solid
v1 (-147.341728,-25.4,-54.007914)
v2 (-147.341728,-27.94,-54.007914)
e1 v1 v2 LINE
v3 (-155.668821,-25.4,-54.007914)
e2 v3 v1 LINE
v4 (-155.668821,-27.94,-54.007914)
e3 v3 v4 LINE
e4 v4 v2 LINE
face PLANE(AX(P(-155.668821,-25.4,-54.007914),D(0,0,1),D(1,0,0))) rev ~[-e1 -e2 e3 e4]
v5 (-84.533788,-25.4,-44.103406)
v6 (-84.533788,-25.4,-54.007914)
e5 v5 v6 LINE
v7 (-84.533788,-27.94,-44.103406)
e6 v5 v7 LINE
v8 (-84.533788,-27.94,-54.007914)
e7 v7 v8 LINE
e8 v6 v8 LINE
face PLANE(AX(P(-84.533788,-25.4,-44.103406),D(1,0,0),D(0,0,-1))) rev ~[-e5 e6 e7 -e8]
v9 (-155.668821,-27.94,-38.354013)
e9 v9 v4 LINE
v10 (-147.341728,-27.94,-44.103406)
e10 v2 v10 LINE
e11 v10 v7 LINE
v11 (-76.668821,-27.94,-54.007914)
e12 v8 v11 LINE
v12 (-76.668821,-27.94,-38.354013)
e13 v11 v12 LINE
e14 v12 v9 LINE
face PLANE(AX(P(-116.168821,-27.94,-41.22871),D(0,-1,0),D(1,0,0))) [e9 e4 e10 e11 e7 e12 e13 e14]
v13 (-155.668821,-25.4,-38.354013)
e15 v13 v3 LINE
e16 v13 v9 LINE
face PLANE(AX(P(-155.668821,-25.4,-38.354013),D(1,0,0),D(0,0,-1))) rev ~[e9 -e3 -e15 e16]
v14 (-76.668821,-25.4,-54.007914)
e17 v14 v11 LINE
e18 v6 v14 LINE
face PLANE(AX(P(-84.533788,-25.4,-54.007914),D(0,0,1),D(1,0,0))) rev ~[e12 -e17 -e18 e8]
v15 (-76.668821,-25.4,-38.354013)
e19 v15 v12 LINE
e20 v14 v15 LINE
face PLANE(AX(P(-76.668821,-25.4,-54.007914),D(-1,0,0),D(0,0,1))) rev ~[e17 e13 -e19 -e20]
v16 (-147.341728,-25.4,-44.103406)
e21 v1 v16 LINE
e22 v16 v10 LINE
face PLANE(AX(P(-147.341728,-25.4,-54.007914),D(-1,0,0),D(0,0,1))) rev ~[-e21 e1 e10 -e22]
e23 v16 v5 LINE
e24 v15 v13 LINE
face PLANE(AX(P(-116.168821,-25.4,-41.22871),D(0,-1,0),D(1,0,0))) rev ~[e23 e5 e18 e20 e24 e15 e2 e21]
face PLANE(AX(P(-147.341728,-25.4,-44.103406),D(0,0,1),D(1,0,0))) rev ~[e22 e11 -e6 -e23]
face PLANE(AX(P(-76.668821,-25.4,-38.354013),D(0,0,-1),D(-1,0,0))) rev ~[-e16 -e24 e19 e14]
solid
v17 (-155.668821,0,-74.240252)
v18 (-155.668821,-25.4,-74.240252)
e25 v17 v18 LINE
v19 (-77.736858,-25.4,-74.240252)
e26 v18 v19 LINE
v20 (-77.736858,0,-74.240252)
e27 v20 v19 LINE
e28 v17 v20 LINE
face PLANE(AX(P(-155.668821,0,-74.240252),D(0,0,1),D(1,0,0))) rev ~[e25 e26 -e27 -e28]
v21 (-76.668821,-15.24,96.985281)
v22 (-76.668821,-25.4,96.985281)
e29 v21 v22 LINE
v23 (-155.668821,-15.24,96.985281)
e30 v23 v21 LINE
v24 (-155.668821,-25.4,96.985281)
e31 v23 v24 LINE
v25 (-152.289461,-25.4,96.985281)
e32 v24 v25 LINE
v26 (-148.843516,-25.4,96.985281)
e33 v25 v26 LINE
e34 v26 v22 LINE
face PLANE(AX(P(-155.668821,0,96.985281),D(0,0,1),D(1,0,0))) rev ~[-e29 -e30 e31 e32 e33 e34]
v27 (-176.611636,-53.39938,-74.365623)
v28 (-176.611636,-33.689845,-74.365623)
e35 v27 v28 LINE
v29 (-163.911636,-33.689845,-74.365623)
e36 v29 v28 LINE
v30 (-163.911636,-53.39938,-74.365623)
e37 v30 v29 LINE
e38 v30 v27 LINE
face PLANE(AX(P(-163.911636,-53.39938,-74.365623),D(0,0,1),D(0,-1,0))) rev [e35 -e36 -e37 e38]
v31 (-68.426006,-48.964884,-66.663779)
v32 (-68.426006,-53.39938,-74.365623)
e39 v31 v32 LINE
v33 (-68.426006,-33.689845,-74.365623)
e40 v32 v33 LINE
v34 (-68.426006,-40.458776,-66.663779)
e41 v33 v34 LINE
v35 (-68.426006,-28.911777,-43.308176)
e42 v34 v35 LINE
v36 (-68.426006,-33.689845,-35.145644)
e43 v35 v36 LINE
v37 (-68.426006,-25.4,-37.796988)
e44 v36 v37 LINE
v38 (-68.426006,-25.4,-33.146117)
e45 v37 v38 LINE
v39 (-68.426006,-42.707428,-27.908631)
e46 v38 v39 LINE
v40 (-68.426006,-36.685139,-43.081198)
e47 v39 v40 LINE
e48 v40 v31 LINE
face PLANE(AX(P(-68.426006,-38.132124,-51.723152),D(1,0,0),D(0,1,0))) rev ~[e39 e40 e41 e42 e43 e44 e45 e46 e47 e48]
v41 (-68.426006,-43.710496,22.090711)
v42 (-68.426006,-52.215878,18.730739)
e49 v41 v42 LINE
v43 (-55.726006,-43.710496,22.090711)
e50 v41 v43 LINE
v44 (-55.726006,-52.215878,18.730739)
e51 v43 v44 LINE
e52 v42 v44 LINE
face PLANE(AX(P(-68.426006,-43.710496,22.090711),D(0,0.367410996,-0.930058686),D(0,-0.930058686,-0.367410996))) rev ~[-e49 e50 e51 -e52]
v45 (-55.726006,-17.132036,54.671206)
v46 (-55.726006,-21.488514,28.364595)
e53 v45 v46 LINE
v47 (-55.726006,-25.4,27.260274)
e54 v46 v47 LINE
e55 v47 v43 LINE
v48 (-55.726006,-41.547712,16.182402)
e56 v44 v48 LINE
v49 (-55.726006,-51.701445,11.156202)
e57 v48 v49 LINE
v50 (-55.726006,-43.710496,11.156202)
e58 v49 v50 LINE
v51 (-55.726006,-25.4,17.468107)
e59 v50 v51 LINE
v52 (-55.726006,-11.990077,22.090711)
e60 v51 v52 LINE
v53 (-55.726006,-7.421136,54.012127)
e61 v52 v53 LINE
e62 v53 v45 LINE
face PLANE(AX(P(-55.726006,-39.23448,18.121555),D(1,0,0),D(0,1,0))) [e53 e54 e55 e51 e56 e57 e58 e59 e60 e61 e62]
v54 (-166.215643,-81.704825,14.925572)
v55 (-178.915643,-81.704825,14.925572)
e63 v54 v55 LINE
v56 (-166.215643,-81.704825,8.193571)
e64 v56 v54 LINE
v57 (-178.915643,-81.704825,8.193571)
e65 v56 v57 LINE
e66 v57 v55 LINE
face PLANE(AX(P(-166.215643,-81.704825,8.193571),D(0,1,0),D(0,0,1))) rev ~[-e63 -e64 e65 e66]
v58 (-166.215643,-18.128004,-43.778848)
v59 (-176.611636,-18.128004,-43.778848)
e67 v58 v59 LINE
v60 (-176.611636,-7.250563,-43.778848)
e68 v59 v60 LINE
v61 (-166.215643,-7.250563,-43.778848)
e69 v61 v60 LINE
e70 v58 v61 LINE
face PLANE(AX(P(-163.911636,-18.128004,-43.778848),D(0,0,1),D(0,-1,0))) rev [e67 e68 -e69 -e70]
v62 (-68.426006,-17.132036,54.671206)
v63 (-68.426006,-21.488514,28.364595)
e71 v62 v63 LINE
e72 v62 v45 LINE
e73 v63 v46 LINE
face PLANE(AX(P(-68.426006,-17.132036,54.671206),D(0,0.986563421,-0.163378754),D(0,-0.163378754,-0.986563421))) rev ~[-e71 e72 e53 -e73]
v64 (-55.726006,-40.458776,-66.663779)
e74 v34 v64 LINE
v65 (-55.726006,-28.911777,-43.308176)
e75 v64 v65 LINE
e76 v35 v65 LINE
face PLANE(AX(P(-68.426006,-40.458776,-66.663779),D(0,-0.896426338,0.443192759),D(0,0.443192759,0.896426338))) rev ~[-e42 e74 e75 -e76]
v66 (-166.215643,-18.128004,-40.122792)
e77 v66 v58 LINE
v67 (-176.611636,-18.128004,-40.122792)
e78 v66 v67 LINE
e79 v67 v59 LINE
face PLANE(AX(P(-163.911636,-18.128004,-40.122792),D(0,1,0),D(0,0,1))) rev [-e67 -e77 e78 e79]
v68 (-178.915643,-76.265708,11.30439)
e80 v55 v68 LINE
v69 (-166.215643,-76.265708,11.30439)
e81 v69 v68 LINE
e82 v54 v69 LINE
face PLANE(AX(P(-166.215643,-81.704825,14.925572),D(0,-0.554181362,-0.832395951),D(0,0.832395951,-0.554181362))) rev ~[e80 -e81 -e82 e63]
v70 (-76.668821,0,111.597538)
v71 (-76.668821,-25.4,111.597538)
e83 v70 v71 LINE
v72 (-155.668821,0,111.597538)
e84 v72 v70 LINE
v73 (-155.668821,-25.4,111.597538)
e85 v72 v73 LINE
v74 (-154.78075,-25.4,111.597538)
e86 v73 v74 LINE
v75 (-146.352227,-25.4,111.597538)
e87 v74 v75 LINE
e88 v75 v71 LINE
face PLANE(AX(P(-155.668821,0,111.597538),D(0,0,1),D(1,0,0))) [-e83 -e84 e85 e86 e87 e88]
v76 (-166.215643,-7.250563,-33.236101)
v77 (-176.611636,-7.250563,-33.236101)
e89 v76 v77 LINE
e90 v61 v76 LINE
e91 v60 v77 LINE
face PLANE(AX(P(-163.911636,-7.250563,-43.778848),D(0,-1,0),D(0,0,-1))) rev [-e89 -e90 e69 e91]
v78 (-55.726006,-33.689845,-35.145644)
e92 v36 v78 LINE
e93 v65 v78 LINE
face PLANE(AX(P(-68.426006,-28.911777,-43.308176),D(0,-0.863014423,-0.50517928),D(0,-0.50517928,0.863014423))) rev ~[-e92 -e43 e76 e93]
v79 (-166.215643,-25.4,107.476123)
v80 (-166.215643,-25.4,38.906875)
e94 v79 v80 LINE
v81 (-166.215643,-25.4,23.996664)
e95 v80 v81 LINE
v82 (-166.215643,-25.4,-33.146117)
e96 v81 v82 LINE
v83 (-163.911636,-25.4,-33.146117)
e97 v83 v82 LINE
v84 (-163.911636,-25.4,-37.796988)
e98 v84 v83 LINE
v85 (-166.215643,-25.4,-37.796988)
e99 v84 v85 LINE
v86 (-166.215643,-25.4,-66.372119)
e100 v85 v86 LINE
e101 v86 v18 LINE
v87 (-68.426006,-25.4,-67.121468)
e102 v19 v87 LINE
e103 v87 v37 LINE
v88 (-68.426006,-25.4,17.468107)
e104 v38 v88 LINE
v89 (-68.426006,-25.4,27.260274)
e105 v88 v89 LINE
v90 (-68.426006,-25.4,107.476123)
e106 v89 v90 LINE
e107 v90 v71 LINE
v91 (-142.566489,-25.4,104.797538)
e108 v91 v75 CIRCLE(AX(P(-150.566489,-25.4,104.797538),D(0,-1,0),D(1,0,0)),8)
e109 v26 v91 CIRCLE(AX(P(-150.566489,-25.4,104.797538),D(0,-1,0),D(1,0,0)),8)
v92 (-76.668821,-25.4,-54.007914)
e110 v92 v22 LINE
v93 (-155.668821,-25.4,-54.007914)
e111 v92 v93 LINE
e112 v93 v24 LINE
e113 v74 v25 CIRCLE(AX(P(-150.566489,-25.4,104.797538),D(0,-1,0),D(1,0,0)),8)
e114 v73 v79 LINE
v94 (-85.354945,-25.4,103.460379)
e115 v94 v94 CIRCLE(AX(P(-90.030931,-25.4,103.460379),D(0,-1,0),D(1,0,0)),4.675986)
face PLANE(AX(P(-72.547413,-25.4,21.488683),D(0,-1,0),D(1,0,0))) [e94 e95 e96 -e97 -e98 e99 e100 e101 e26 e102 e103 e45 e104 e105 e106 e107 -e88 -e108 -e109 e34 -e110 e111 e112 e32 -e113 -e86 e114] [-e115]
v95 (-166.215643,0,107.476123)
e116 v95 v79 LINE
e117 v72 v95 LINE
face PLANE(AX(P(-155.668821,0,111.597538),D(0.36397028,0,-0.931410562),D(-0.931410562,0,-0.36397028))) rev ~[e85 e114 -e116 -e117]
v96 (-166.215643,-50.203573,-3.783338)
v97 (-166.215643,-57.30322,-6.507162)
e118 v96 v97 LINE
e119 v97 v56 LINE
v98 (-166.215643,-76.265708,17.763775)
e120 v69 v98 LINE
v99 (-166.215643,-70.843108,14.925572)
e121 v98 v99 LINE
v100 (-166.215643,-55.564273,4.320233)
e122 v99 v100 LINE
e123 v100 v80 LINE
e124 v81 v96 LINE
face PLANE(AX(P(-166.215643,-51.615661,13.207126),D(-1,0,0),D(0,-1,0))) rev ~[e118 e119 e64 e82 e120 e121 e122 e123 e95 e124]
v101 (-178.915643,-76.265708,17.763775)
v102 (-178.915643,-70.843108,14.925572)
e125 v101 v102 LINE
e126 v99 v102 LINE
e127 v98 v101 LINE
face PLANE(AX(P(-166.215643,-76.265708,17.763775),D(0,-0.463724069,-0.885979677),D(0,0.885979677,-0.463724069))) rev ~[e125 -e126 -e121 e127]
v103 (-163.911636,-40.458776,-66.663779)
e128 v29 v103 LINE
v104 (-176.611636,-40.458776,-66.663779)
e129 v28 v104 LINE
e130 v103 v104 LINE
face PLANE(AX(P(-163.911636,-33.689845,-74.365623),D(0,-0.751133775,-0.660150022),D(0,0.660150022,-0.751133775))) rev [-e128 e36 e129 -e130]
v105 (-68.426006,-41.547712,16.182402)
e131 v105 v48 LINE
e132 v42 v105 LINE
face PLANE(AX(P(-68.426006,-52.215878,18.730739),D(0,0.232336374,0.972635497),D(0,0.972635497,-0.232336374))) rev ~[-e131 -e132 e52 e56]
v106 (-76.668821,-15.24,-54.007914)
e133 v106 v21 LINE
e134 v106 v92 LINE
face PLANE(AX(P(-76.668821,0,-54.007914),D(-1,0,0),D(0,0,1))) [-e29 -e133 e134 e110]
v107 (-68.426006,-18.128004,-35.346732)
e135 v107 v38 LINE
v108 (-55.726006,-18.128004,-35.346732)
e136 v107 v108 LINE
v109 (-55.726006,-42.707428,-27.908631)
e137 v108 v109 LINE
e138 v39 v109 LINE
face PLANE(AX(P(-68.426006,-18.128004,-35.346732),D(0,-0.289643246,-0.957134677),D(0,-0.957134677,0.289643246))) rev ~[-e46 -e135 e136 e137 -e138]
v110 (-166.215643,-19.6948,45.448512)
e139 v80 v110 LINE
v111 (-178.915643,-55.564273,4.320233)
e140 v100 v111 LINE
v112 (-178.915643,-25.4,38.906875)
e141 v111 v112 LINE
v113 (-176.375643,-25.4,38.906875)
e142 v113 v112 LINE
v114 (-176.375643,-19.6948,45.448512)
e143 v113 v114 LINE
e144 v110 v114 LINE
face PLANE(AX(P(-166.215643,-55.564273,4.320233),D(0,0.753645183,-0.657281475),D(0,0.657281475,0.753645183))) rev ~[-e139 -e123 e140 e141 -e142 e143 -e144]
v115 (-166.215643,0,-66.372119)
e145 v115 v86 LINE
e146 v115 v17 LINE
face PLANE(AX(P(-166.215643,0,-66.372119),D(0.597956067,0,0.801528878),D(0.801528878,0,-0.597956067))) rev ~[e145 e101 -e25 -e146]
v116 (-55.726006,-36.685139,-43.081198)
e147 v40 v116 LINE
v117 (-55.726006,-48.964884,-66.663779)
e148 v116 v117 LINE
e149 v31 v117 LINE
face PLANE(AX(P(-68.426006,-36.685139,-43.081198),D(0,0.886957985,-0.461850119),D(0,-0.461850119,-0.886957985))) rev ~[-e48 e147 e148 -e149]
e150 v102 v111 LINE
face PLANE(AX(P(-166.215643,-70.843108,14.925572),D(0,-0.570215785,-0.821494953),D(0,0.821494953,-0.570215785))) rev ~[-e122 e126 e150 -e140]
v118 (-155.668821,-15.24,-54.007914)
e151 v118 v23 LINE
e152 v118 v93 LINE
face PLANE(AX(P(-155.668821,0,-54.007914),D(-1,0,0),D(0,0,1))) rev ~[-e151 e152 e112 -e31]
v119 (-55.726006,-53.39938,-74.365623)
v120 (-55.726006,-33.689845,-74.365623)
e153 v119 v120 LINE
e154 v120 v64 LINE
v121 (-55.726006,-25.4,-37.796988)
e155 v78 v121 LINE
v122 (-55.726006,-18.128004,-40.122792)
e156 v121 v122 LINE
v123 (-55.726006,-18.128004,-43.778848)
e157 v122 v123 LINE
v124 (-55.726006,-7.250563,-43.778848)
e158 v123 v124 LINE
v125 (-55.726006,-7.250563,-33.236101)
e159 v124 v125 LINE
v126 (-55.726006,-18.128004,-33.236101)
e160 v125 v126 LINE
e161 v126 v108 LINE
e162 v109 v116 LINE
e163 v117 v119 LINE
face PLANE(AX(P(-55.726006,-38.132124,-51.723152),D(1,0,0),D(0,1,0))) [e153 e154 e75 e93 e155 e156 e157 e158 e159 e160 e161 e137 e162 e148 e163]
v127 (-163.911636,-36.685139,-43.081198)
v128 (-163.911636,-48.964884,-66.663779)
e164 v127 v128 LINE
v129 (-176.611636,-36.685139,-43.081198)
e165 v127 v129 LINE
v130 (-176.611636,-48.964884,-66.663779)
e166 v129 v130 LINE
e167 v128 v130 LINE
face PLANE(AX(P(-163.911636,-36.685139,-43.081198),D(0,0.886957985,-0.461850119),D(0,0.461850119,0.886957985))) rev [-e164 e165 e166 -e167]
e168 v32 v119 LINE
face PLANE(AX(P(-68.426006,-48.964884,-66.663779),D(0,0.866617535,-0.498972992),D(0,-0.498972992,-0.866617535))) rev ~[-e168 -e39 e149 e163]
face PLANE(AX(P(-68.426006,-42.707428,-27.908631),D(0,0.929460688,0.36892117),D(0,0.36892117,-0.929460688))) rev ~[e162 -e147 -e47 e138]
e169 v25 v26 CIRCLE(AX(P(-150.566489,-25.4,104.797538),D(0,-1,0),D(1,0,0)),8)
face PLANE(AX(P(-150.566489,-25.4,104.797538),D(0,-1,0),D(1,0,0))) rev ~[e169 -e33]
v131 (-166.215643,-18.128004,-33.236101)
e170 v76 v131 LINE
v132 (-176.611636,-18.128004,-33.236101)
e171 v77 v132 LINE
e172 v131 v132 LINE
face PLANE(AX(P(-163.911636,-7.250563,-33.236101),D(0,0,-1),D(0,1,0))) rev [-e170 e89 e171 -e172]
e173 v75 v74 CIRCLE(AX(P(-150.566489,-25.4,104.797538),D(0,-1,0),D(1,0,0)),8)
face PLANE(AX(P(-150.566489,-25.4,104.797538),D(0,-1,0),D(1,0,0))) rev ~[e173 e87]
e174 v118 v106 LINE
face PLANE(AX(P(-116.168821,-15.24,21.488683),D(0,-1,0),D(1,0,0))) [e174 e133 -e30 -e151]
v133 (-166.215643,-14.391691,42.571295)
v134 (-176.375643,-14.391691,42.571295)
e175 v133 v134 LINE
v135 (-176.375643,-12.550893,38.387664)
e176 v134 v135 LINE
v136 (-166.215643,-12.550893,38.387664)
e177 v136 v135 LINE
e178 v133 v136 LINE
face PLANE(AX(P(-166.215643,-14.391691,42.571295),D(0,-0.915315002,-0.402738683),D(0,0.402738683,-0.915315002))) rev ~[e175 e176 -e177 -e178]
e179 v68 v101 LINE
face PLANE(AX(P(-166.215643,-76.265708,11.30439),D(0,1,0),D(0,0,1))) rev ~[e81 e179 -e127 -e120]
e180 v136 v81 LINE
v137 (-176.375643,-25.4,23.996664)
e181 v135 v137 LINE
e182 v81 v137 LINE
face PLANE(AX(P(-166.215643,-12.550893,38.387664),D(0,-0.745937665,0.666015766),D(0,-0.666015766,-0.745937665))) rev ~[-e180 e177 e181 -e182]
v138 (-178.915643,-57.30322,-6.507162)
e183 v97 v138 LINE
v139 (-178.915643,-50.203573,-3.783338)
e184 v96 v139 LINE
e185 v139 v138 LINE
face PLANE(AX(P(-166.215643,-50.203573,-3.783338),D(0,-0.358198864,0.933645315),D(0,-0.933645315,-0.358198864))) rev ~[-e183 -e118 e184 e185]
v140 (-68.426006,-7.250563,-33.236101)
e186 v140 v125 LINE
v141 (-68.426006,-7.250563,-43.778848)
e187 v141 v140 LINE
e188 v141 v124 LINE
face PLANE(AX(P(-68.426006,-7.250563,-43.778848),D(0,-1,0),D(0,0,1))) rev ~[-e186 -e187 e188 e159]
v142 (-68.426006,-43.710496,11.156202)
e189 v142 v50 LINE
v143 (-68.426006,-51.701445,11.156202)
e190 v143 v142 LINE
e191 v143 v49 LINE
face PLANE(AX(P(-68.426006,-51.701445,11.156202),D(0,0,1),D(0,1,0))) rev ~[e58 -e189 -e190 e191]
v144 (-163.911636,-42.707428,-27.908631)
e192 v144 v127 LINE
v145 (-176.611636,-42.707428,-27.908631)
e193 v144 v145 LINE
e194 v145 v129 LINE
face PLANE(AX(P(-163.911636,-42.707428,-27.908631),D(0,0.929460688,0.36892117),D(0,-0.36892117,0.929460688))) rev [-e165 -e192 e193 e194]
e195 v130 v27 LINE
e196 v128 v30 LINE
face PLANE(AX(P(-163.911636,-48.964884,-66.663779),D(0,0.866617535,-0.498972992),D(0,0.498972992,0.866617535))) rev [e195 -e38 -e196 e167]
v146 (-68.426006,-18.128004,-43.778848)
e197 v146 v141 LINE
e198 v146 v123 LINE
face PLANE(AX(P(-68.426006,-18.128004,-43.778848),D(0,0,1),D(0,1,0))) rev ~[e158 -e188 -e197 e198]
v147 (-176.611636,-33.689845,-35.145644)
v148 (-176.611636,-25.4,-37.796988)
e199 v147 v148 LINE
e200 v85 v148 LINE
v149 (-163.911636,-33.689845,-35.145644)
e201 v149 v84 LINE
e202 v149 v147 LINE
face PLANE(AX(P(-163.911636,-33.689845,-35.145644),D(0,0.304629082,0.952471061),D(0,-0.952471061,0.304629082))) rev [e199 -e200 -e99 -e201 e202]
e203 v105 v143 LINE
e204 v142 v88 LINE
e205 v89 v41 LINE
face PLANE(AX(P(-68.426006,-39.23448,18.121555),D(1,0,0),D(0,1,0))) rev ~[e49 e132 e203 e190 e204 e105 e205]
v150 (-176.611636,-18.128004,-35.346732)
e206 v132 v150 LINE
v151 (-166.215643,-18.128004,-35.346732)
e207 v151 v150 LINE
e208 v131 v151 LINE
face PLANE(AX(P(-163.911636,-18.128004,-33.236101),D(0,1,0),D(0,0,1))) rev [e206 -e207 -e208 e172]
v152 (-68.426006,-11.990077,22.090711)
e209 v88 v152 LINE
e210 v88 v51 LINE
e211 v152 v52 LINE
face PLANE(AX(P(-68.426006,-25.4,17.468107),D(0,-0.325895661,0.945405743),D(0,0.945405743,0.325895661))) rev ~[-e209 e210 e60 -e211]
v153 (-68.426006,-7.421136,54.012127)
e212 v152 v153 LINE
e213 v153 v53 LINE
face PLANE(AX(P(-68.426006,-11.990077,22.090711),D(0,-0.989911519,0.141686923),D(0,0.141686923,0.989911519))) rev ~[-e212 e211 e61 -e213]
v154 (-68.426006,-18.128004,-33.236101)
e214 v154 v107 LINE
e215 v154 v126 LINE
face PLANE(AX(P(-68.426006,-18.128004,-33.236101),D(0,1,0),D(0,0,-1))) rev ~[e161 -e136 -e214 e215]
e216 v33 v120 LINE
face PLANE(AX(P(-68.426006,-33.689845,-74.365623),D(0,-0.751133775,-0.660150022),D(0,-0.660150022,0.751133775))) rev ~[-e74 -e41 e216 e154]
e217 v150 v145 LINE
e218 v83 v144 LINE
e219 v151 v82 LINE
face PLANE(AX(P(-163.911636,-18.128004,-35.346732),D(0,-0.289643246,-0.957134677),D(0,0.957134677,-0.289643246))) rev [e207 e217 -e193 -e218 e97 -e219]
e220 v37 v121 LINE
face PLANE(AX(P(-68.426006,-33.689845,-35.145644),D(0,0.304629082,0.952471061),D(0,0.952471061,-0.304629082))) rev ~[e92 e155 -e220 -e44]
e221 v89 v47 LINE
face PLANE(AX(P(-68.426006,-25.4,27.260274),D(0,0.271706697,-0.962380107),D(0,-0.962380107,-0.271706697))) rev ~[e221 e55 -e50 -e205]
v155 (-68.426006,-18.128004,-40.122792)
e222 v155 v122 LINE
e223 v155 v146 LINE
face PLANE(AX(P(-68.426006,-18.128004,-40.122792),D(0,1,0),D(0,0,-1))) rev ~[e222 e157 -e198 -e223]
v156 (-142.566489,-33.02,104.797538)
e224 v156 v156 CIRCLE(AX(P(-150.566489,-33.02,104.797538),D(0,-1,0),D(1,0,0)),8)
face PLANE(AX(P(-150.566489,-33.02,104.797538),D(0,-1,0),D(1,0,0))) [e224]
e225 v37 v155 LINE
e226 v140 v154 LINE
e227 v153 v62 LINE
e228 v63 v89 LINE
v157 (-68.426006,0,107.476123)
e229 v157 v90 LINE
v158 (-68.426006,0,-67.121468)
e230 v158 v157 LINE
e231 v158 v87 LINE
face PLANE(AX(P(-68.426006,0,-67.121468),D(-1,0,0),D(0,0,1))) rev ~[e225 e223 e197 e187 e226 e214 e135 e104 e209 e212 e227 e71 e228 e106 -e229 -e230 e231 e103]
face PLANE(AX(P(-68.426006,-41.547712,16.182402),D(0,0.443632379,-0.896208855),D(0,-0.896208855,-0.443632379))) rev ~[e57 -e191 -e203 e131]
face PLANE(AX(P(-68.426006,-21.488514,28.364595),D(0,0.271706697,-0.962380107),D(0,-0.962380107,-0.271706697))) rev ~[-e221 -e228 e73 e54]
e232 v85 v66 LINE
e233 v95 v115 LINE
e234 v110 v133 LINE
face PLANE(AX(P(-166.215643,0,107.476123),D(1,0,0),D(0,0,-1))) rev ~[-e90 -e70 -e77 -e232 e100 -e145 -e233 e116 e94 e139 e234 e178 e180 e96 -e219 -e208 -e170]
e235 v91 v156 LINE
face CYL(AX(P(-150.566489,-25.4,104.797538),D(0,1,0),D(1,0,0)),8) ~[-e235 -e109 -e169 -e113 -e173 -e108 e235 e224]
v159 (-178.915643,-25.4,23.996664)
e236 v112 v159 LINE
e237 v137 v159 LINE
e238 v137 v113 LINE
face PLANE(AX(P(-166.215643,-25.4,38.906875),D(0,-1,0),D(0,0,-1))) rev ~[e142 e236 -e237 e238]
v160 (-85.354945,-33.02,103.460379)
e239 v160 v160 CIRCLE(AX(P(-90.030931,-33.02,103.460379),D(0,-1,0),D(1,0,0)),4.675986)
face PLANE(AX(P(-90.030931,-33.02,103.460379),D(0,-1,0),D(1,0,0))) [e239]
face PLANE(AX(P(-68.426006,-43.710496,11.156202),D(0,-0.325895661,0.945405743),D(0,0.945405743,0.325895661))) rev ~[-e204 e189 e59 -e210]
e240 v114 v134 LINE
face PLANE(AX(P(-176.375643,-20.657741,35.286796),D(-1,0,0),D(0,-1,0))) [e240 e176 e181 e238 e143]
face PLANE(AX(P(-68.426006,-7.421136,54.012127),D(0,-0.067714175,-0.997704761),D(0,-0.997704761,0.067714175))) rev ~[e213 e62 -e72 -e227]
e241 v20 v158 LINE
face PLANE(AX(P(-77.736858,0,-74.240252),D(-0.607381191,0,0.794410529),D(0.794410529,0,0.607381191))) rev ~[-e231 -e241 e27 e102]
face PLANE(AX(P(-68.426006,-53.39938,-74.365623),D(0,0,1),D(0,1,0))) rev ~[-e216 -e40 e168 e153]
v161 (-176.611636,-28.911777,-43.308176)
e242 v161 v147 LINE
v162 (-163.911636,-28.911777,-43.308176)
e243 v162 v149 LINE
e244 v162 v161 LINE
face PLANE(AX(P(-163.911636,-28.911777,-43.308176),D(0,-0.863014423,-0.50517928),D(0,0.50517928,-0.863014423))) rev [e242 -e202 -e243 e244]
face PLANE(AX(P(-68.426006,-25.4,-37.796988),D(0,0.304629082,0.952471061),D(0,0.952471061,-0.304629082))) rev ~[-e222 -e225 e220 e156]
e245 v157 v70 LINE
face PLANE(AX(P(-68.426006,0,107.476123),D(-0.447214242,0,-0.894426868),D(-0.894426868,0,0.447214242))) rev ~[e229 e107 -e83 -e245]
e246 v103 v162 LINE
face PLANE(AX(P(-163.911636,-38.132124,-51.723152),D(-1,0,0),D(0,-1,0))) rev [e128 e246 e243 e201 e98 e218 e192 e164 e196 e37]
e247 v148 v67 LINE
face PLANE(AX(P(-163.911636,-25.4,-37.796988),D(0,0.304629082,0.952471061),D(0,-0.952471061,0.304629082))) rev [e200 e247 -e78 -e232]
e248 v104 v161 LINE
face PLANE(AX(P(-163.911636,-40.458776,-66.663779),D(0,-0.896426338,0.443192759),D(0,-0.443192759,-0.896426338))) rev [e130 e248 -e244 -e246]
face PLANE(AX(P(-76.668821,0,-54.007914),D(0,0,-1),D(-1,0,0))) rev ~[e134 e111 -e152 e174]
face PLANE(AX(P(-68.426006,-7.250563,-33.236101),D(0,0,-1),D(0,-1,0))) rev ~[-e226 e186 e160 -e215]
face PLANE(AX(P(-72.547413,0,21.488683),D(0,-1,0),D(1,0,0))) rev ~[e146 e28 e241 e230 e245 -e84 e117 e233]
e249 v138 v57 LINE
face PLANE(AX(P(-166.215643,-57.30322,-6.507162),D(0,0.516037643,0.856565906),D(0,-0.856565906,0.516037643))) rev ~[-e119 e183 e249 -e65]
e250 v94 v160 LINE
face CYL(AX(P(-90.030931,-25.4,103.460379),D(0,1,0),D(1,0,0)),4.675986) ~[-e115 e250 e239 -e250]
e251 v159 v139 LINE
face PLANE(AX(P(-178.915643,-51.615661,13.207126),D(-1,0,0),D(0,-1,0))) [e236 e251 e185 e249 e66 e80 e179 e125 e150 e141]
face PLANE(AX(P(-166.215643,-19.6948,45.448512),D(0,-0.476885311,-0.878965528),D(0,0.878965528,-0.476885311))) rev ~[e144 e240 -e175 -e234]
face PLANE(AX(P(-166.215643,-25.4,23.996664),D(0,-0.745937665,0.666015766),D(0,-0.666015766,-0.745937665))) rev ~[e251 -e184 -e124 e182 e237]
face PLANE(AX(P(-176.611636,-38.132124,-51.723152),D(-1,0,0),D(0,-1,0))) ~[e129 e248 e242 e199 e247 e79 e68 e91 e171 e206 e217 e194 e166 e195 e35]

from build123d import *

# Parameters (mm, degrees)
F0_W      = 79
F0_H      = 150.9931944311
F1_DEPTH  = 15.24
F0_W_2    = 8.242815733
F0_H_2    = 14.6122574806
F0_W_3    = 10.5468220115
F2_DEPTH  = 25.4
F3_W      = 8.3270930648
F3_H      = 9.9045075476
F4_DEPTH  = 2.54
F5_R      = 8
F5_R_2    = 4.6759862525
F6_DEPTH  = 7.62
F8_DEPTH  = 10.16
F10_DEPTH = 12.7
F11_DEPTH = 12.7
F13_DEPTH = 12.7


# Not quite as in the source:
# - a pattern or mirror of a feature is missing from the dataset's text; its kind, count and spacing are read off the source's solid
# - a feature names something its author has since deleted; it is built from what else it names


with BuildPart() as f1:
    # F0 (on Front) → F1 (new body)
    with BuildSketch(Plane.XZ):
        with Locations((-116.1688212752, 21.4886832982)):
            Rectangle(F0_W, F0_H)
    extrude(amount=F1_DEPTH)

    # F0 (on Front) → F2 (join)
    with BuildSketch(Plane.XZ):
        with Locations((-72.5474134088, 21.4886832982)):
            Rectangle(F0_W_2, F0_H)
        with Locations((-116.1688212752, 104.2914092541)):
            Rectangle(F0_W, F0_H_2)
        Polygon((-76.6688212752, 111.5975379944), (-76.6688212752, 96.9852805138), (-68.4260055423, 96.9852805138), (-68.4260055423, 107.4761226773), align=None)
        Polygon((-77.7368583679, -74.2402523756), (-76.6688212752, -54.0079139173), (-155.6688212752, -54.0079139173), (-155.6688212752, -74.2402523756), align=None)
        Polygon((-68.4260055423, -54.0079139173), (-76.6688212752, -54.0079139173), (-77.7368583679, -74.2402523756), (-68.4260055423, -67.1214684844), align=None)
        with Locations((-160.942232281, 21.4886832982)):
            Rectangle(F0_W_3, F0_H)
        Polygon((-166.2156432867, 96.9852805138), (-155.6688212752, 96.9852805138), (-155.6688212752, 111.5975379944), (-166.2156432867, 107.4761226773), align=None)
        Polygon((-155.6688212752, -74.2402523756), (-155.6688212752, -54.0079139173), (-166.2156432867, -54.0079139173), (-166.2156432867, -66.3721188903), align=None)
    extrude(amount=F2_DEPTH)

    # F5 (on face) → F6 (join)
    with BuildSketch(Plane.XZ.offset(25.4)):
        with Locations((-150.5664885044, 104.7975379944)):
            Circle(F5_R)
        with Locations((-90.0309309363, 103.4603789449)):
            Circle(F5_R_2)
    extrude(amount=F6_DEPTH)

    # F7 (on face) → F8 (join)
    with BuildSketch(Plane(origin=(-166.2156432867, 0, 0), x_dir=(0, -1, 0), z_dir=(-1, 0, 0))):
        Polygon((12.5508932397, 38.3876636624), (25.4, 23.9966639606), (25.4, 38.9068748126), (19.6947995573, 45.4485118389), (14.391691424, 42.5712950528), align=None)
    extrude(amount=F8_DEPTH)

    # F9 (on face) → F10 (join)
    with BuildSketch(Plane.YZ.offset(-68.4260055423)):
        Polygon((-25.4, -37.796987619), (-25.4, -33.1461169376), (-42.7074283361, -27.9086306691), (-36.6851389408, -43.0811978877), (-48.9648841321, -66.6637793183), (-53.3993802965, -74.3656232953), (-33.6898453534, -74.3656232953), (-40.4587760568, -66.6637793183), (-28.9117768407, -43.3081761003), (-33.6898453534, -35.1456440985), align=None)
        Polygon((-18.1280039251, -40.1227921247), (-18.1280039251, -35.3467315435), (-25.4, -33.1461169376), (-25.4, -37.796987619), align=None)
        Polygon((-7.2505627759, -33.2361012697), (-18.1280039251, -33.2361012697), (-18.1280039251, -35.3467315435), (-18.1280039251, -40.1227921247), (-18.1280039251, -43.778847903), (-7.2505627759, -43.778847903), align=None)
    f10 = extrude(amount=F10_DEPTH)

    # F10_copies: F10 across plane
    add(f10.mirror(Plane(origin=(-116.168821, 0, 0), x_dir=(0, 0, -1), z_dir=(-1, 0, 0))))

    # F7 (on face) → F11 (join)
    with BuildSketch(Plane(origin=(-166.2156432867, 0, 0), x_dir=(0, -1, 0), z_dir=(-1, 0, 0))):
        Polygon((25.4, 23.9966639606), (50.2035729587, -3.7833380047), (57.3032200336, -6.5071620047), (81.7048251629, 8.1935711205), (81.7048251629, 14.9255720899), (76.265707612, 11.3043896854), (76.265707612, 17.763774842), (70.8431079984, 14.9255720899), (55.5642731488, 4.3202326633), (25.4, 38.9068748126), align=None)
    extrude(amount=F11_DEPTH)

    # F12 (on face) → F13 (join)
    with BuildSketch(Plane.YZ.offset(-68.4260055423)):
        Polygon((-25.4, 17.4681073426), (-25.4, 27.2602735729), (-43.7104962766, 22.0907106996), (-52.2158779204, 18.7307391316), (-41.5477119386, 16.1824021488), (-51.7014451325, 11.1562022939), (-43.7104962766, 11.1562022939), align=None)
        Polygon((-7.4211359024, 54.0121272206), (-17.1320363879, 54.6712055802), (-21.4885137975, 28.3645950258), (-25.4, 27.2602735729), (-25.4, 17.4681073426), (-11.9900768623, 22.0907106996), align=None)
    extrude(amount=F13_DEPTH)


with BuildPart() as f4:
    # F3 (on face) → F4 (new body)
    with BuildSketch(Plane.XZ.offset(25.4)):
        Polygon((-76.6688212752, -44.1034063697), (-76.6688212752, -38.3540131152), (-155.6688212752, -38.3540131152), (-155.6688212752, -44.1034063697), (-147.3417282104, -44.1034063697), (-84.5337882638, -44.1034063697), align=None)
        Polygon((-76.6688212752, -54.0079139173), (-76.6688212752, -44.1034063697), (-84.5337882638, -44.1034063697), (-84.5337882638, -54.0079139173), (-81.2943726778, -54.0079139173), align=None)
        with Locations((-151.5052747428, -49.0556601435)):
            Rectangle(F3_W, F3_H)
    extrude(amount=F4_DEPTH)


solid = Compound([f1.part, f4.part])
